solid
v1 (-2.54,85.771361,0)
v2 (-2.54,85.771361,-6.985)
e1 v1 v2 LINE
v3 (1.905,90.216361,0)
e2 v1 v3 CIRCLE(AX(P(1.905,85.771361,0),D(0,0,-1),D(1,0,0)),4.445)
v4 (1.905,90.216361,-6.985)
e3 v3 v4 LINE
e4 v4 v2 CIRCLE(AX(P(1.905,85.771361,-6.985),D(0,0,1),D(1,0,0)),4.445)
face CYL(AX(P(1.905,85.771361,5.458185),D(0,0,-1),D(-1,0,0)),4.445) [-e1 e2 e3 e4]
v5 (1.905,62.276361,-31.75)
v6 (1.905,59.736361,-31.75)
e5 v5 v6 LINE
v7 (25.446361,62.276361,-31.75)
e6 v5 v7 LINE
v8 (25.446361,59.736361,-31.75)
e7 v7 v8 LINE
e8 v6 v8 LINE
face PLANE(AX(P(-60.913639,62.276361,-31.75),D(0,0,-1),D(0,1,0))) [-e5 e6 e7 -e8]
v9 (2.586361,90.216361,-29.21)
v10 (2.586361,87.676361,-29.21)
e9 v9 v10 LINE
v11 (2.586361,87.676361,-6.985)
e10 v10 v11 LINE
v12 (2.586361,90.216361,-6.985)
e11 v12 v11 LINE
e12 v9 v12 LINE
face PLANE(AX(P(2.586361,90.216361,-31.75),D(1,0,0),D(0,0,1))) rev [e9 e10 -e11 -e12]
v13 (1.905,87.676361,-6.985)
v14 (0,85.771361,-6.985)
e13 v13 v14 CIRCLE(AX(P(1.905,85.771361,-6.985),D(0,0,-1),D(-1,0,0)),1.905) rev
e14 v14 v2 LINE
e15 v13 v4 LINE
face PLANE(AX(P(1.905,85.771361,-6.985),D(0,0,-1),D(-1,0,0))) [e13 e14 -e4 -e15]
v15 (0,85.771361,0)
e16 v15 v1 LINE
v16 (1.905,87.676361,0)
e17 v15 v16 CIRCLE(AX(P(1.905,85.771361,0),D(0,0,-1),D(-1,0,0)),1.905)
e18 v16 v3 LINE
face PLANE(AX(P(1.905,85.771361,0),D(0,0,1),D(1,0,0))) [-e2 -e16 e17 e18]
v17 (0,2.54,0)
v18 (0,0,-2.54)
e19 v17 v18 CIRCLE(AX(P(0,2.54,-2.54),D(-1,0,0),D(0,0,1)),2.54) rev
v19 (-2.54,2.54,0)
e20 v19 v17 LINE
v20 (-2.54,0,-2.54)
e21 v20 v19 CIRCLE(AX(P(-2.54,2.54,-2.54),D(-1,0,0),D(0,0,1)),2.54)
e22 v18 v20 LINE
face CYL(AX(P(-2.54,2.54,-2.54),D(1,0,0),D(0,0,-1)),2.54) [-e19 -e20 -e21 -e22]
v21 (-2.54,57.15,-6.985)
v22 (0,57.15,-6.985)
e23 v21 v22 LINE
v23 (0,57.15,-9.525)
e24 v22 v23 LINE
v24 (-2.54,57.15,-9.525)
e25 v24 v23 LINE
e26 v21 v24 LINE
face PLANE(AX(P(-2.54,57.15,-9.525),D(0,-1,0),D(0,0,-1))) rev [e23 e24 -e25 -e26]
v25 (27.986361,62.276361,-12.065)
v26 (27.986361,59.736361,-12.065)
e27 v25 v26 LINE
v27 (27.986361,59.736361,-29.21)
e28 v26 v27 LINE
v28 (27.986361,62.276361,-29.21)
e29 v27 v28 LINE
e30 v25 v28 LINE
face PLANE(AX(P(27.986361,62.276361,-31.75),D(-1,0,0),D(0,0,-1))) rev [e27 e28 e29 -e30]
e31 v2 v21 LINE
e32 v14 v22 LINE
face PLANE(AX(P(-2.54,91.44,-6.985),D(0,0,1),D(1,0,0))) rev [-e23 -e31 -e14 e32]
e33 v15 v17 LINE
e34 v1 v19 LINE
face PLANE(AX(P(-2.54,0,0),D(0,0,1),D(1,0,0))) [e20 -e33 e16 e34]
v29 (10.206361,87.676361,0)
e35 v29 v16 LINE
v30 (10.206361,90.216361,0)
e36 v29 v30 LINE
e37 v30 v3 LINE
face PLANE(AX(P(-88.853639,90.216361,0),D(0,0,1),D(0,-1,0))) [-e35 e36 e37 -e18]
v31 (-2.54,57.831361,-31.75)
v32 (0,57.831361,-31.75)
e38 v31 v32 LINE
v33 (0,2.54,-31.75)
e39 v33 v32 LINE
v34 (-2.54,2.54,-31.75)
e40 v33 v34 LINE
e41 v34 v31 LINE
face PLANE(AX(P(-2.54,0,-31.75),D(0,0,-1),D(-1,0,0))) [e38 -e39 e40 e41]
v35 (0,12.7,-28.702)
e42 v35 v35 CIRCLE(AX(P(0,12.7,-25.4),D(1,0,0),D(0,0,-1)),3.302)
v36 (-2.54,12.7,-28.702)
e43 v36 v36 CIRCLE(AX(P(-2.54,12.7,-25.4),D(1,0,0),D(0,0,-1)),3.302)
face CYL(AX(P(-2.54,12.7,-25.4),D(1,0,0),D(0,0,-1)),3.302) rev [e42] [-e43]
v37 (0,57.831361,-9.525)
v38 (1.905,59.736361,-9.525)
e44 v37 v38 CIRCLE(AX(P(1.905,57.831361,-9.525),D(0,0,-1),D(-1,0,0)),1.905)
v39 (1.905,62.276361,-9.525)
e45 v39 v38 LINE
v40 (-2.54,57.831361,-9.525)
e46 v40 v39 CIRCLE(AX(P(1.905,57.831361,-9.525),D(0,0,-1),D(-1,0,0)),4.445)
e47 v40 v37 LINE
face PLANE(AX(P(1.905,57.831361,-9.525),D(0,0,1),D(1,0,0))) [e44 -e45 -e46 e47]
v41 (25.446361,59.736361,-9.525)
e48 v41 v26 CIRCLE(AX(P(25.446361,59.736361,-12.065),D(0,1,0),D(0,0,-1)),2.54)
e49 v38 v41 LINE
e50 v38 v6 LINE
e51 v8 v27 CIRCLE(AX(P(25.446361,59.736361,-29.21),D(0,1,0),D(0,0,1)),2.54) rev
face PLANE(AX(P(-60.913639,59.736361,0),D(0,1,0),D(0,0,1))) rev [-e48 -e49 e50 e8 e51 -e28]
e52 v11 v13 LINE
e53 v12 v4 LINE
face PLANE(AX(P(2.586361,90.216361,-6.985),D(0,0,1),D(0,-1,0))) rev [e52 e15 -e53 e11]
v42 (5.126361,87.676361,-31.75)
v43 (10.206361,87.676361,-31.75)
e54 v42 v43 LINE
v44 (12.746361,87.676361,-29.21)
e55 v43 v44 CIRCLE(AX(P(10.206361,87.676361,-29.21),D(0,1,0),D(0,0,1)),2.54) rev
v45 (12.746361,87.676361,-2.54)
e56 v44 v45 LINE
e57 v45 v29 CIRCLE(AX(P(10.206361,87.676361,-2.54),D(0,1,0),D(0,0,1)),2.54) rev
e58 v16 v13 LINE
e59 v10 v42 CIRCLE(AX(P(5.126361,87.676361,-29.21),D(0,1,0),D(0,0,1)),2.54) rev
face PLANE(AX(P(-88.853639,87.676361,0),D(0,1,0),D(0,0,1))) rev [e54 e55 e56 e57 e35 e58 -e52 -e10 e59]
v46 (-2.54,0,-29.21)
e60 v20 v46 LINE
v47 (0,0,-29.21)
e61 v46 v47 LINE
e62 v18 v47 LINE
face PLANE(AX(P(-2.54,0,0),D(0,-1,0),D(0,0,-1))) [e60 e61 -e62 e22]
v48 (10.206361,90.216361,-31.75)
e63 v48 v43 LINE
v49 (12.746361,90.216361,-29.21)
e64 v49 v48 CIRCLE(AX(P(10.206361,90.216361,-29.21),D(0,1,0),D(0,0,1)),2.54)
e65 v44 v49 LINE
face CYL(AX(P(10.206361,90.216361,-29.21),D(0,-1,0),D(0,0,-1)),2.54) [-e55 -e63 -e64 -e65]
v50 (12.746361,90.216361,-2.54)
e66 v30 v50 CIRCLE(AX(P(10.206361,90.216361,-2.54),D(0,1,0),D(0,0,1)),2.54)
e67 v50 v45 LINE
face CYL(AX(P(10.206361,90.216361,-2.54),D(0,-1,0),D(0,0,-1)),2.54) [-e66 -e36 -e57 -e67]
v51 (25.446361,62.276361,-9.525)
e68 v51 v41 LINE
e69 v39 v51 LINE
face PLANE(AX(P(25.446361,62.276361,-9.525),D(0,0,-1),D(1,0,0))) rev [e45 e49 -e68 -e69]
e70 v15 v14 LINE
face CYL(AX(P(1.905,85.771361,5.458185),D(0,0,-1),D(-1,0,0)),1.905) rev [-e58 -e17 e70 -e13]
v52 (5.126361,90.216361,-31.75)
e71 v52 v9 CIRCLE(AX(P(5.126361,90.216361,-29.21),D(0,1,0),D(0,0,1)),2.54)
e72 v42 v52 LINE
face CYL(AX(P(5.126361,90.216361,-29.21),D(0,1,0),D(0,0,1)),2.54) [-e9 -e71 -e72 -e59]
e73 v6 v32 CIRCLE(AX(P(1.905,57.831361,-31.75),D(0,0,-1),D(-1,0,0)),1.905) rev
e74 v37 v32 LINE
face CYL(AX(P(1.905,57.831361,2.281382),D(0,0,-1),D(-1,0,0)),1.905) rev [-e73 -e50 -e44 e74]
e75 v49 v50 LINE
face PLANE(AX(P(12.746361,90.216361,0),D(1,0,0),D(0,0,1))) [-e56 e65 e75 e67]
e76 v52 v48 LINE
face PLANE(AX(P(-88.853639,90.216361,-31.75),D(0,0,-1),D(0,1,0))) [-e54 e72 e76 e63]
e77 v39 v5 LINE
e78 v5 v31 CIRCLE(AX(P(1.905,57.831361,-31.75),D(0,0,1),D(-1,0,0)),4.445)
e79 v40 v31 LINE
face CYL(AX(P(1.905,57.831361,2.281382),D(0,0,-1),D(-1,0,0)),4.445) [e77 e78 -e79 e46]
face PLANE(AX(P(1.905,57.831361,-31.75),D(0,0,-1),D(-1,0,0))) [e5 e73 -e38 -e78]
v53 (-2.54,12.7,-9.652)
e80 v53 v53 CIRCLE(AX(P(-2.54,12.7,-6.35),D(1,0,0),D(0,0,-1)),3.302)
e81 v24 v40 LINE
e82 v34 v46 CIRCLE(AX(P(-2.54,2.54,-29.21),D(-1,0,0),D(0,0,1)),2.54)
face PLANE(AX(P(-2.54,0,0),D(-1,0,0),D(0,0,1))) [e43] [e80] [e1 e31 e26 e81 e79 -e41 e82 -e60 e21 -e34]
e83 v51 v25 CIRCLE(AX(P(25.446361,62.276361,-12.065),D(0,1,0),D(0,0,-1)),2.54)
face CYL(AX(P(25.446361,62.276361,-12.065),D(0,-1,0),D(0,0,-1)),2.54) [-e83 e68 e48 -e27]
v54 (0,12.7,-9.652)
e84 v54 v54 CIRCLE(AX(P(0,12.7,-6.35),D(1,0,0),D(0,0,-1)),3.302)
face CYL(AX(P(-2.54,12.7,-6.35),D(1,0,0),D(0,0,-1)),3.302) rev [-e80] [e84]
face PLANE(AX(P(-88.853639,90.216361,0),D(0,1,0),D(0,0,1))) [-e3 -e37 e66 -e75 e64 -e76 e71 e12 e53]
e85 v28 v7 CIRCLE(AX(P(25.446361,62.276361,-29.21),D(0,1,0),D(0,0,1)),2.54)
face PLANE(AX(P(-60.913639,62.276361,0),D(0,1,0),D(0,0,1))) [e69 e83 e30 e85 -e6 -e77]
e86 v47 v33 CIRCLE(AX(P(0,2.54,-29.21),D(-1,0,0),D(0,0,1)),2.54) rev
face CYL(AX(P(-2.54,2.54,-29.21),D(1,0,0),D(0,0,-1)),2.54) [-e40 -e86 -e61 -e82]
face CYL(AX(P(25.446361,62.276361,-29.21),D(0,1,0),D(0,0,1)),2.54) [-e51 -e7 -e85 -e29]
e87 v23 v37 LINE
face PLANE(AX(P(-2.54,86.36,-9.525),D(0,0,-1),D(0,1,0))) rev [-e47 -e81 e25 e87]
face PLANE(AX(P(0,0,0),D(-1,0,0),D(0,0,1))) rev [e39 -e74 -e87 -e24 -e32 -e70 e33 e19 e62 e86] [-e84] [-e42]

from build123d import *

# Parameters (mm, degrees)
SKETCH1_W                  = 31.75
SKETCH1_H                  = 101.6
BASE_FLANGE1_DEPTH         = 2.54
CUT_EXTRUDE1_DEPTH         = 107.475697227
FILLET1_R                  = 2.54
FILLET2_R                  = 2.54
SKETCH7_R                  = 3.302
CUT_EXTRUDE2_DEPTH         = 2.54
SKETCHED_START             = 61.806879931
SKETCHED_BEND7_OUTLINE_W   = 2.54
SKETCHED_BEND7_OUTLINE_H   = 22.225
SKETCHED_BEND7_DEPTH       = 27.093120069
SKETCHED_START_2           = 59.736360831
SKETCHED_BEND7_2_DEPTH     = 2.0705191
SKETCHED_START_3           = 57.831360831
SKETCHED_BEND7_3_DEPTH     = 4.445
SKETCHED_START_4           = -33
SKETCHED_BEND7_4_DEPTH     = 23.475
SKETCHED_START_5           = -31.75
SKETCHED_BEND7_5_DEPTH     = 22.225
SKETCHED_START_6           = 90.216360831
SKETCHED_BEND8_OUTLINE_W   = 2.54
SKETCHED_BEND8_OUTLINE_H   = 31.75
SKETCHED_BEND8_DEPTH       = 11.383639169
SKETCHED_START_7           = 87.676360831
SKETCHED_BEND8_2_DEPTH     = 2.0705191
SKETCHED_START_8           = 89.948086031
SKETCHED_BEND8_3_OUTLINE_W = 2.54
SKETCHED_BEND8_3_OUTLINE_H = 6.985
SKETCHED_BEND8_3_DEPTH     = 0.2682748
SKETCHED_START_9           = 85.771360831
SKETCHED_BEND8_4_DEPTH     = 4.445
SKETCHED_BEND8_5_DEPTH     = 31.75


with BuildPart() as part:
    # Base-Flange1: sheet metal written as solids
    # Sketch1 → Base-Flange1 (new body)
    with BuildSketch(Plane(origin=(0, 0, 0), x_dir=(0, 0, -1), z_dir=(1, 0, 0))):
        with Locations((15.875, 50.8)):
            Rectangle(SKETCH1_W, SKETCH1_H)
    extrude(amount=-BASE_FLANGE1_DEPTH)

    # Sketch6 → Cut-Extrude1 (cut, through all)
    with BuildSketch(Plane(origin=(0, 0, 0), x_dir=(0, 0, -1), z_dir=(1, 0, 0))):
        with BuildLine():
            Line((31.75, 88.9), (12.065, 88.9))
            ThreePointArc((12.065, 88.9), (10.268948776, 88.156051224), (9.525, 86.36))
            Line((9.525, 86.36), (9.525, 57.15))
            Line((9.525, 57.15), (6.985, 57.15))
            Line((6.985, 57.15), (6.985, 91.44))
            Line((6.985, 91.44), (31.75, 91.44))
            Line((31.75, 91.44), (31.75, 88.9))
        make_face()
    extrude(amount=-CUT_EXTRUDE1_DEPTH, mode=Mode.SUBTRACT)

    # Fillet1
    fillet1_edges = [part.edges().sort_by_distance(p)[0] for p in [
        (-1.27, 88.9, -31.75),
    ]]
    fillet(fillet1_edges, radius=FILLET1_R)

    # Fillet2
    fillet2_edges = [part.edges().sort_by_distance(p)[0] for p in [
        (-1.27, 91.44, -31.75),
        (-1.27, 101.6, 0),
        (-1.27, 101.6, -31.75),
        (-1.27, 0, -31.75),
        (-1.27, 0, 0),
    ]]
    fillet(fillet2_edges, radius=FILLET2_R)

    # Sketch7 → Cut-Extrude2 (cut)
    with BuildSketch(Plane(origin=(0, 0, 0), x_dir=(0, 0, -1), z_dir=(1, 0, 0))):
        with Locations((6.35, 12.7)):
            Circle(SKETCH7_R)
        with Locations((25.4, 12.7)):
            Circle(SKETCH7_R)
    extrude(amount=-CUT_EXTRUDE2_DEPTH, mode=Mode.SUBTRACT)

    # Sketched Bend7: read off the stored shape, not the designer's step
    # Sketched Bend7 outline → Sketched Bend7 (cut)
    with BuildSketch(Plane(origin=(0, 0, 0), x_dir=(1, 0, 0), z_dir=(0, 1, 0)).offset(SKETCHED_START)):
        with Locations((-1.27, 20.6375)):
            Rectangle(SKETCHED_BEND7_OUTLINE_W, SKETCHED_BEND7_OUTLINE_H)
    extrude(amount=SKETCHED_BEND7_DEPTH, mode=Mode.SUBTRACT)

    # Sketched Bend7 2 outline → Sketched Bend7 2 (add)
    with BuildSketch(Plane(origin=(0, 0, 0), x_dir=(1, 0, 0), z_dir=(0, 1, 0)).offset(SKETCHED_START_2)):
        with BuildLine():
            Line((0, 9.525), (25.446360831, 9.525))
            ThreePointArc((25.446360831, 9.525), (27.242412055, 10.268948776), (27.986360831, 12.065))
            Line((27.986360831, 12.065), (27.986360831, 29.21))
            ThreePointArc((27.986360831, 29.21), (27.242412055, 31.006051224), (25.446360831, 31.75))
            Line((25.446360831, 31.75), (0, 31.75))
            Line((0, 31.75), (0, 9.525))
        make_face()
    extrude(amount=SKETCHED_BEND7_2_DEPTH)

    # Sketched Bend7 3 outline → Sketched Bend7 3 (add)
    with BuildSketch(Plane(origin=(0, 0, 0), x_dir=(1, 0, 0), z_dir=(0, 1, 0)).offset(SKETCHED_START_3)):
        with BuildLine():
            Line((0, 9.525), (25.446360831, 9.525))
            ThreePointArc((25.446360831, 9.525), (27.242412055, 10.268948776), (27.986360831, 12.065))
            Line((27.986360831, 12.065), (27.986360831, 29.21))
            ThreePointArc((27.986360831, 29.21), (27.242412055, 31.006051224), (25.446360831, 31.75))
            Line((25.446360831, 31.75), (0, 31.75))
            Line((0, 31.75), (0, 9.525))
        make_face()
    extrude(amount=SKETCHED_BEND7_3_DEPTH)

    # Sketched Bend7 4 outline → Sketched Bend7 4 (cut)
    with BuildSketch(Plane.XY.offset(SKETCHED_START_4)):
        with BuildLine():
            Line((27.986360831, 57.831360831), (27.986360831, 59.736360831))
            Line((27.986360831, 59.736360831), (1.905, 59.736360831))
            ThreePointArc((1.905, 59.736360831), (0.557961582, 59.178399249), (0, 57.831360831))
            Line((0, 57.831360831), (27.986360831, 57.831360831))
        make_face()
        with BuildLine():
            ThreePointArc((-2.54, 57.831360831), (-1.876266121, 60.168036145), (-0.083283905, 61.806879931))
            Line((-0.083283905, 61.806879931), (-2.54, 61.806879931))
            Line((-2.54, 61.806879931), (-2.54, 57.831360831))
        make_face()
        with BuildLine():
            ThreePointArc((0, 61.84745346), (0.928656498, 62.167808498), (1.905, 62.276360831))
            Line((1.905, 62.276360831), (0, 62.276360831))
            Line((0, 62.276360831), (0, 61.84745346))
        make_face()
    extrude(amount=SKETCHED_BEND7_4_DEPTH, mode=Mode.SUBTRACT)

    # Sketched Bend7 5 outline → Sketched Bend7 5 (add)
    with BuildSketch(Plane.XY.offset(SKETCHED_START_5)):
        with BuildLine():
            Line((0, 61.806879931), (0, 61.84745346))
            ThreePointArc((0, 61.84745346), (-0.041747658, 61.827383673), (-0.083283905, 61.806879931))
            Line((-0.083283905, 61.806879931), (0, 61.806879931))
        make_face()
    extrude(amount=SKETCHED_BEND7_5_DEPTH)

    # Sketched Bend8: read off the stored shape, not the designer's step
    # Sketched Bend8 outline → Sketched Bend8 (cut)
    with BuildSketch(Plane(origin=(0, 0, 0), x_dir=(1, 0, 0), z_dir=(0, 1, 0)).offset(SKETCHED_START_6)):
        with Locations((-1.27, 15.875)):
            Rectangle(SKETCHED_BEND8_OUTLINE_W, SKETCHED_BEND8_OUTLINE_H)
    extrude(amount=SKETCHED_BEND8_DEPTH, mode=Mode.SUBTRACT)

    # Sketched Bend8 2 outline → Sketched Bend8 2 (add)
    with BuildSketch(Plane(origin=(0, 0, 0), x_dir=(1, 0, 0), z_dir=(0, 1, 0)).offset(SKETCHED_START_7)):
        with BuildLine():
            Line((0, 6.985), (0, 0))
            Line((0, 0), (10.206360831, 0))
            ThreePointArc((10.206360831, 0), (12.002412055, 0.743948776), (12.746360831, 2.54))
            Line((12.746360831, 2.54), (12.746360831, 29.21))
            ThreePointArc((12.746360831, 29.21), (12.002412055, 31.006051224), (10.206360831, 31.75))
            Line((10.206360831, 31.75), (5.126360831, 31.75))
            ThreePointArc((5.126360831, 31.75), (3.330309607, 31.006051224), (2.586360831, 29.21))
            Line((2.586360831, 29.21), (2.586360831, 6.985))
            Line((2.586360831, 6.985), (0, 6.985))
        make_face()
    extrude(amount=SKETCHED_BEND8_2_DEPTH)

    # Sketched Bend8 3 outline → Sketched Bend8 3 (cut)
    with BuildSketch(Plane(origin=(0, 0, 0), x_dir=(1, 0, 0), z_dir=(0, 1, 0)).offset(SKETCHED_START_8)):
        with Locations((-1.27, 3.4925)):
            Rectangle(SKETCHED_BEND8_3_OUTLINE_W, SKETCHED_BEND8_3_OUTLINE_H)
    extrude(amount=SKETCHED_BEND8_3_DEPTH, mode=Mode.SUBTRACT)

    # Sketched Bend8 4 outline → Sketched Bend8 4 (add)
    with BuildSketch(Plane(origin=(0, 0, 0), x_dir=(1, 0, 0), z_dir=(0, 1, 0)).offset(SKETCHED_START_9)):
        with BuildLine():
            Line((0, 0), (10.206360831, 0))
            ThreePointArc((10.206360831, 0), (12.002412055, 0.743948776), (12.746360831, 2.54))
            Line((12.746360831, 2.54), (12.746360831, 29.21))
            ThreePointArc((12.746360831, 29.21), (12.002412055, 31.006051224), (10.206360831, 31.75))
            Line((10.206360831, 31.75), (5.126360831, 31.75))
            ThreePointArc((5.126360831, 31.75), (3.330309607, 31.006051224), (2.586360831, 29.21))
            Line((2.586360831, 29.21), (2.586360831, 6.985))
            Line((2.586360831, 6.985), (0, 6.985))
            Line((0, 6.985), (0, 0))
        make_face()
    extrude(amount=SKETCHED_BEND8_4_DEPTH)

    # Sketched Bend8 5 outline → Sketched Bend8 5 (cut)
    with BuildSketch(Plane.XY.offset(SKETCHED_START_5)):
        with BuildLine():
            Line((-2.54, 89.948086031), (-2.54, 85.771360831))
            ThreePointArc((-2.54, 85.771360831), (-1.238089643, 88.914450473), (1.905, 90.216360831))
            Line((1.905, 90.216360831), (0, 90.216360831))
            Line((0, 90.216360831), (0, 89.948086031))
            Line((0, 89.948086031), (-2.54, 89.948086031))
        make_face()
        with BuildLine():
            Line((0, 85.771360831), (12.746360831, 85.771360831))
            Line((12.746360831, 85.771360831), (12.746360831, 87.676360831))
            Line((12.746360831, 87.676360831), (1.905, 87.676360831))
            ThreePointArc((1.905, 87.676360831), (0.557961582, 87.118399249), (0, 85.771360831))
        make_face()
    extrude(amount=SKETCHED_BEND8_5_DEPTH, mode=Mode.SUBTRACT)


solid = part.part
